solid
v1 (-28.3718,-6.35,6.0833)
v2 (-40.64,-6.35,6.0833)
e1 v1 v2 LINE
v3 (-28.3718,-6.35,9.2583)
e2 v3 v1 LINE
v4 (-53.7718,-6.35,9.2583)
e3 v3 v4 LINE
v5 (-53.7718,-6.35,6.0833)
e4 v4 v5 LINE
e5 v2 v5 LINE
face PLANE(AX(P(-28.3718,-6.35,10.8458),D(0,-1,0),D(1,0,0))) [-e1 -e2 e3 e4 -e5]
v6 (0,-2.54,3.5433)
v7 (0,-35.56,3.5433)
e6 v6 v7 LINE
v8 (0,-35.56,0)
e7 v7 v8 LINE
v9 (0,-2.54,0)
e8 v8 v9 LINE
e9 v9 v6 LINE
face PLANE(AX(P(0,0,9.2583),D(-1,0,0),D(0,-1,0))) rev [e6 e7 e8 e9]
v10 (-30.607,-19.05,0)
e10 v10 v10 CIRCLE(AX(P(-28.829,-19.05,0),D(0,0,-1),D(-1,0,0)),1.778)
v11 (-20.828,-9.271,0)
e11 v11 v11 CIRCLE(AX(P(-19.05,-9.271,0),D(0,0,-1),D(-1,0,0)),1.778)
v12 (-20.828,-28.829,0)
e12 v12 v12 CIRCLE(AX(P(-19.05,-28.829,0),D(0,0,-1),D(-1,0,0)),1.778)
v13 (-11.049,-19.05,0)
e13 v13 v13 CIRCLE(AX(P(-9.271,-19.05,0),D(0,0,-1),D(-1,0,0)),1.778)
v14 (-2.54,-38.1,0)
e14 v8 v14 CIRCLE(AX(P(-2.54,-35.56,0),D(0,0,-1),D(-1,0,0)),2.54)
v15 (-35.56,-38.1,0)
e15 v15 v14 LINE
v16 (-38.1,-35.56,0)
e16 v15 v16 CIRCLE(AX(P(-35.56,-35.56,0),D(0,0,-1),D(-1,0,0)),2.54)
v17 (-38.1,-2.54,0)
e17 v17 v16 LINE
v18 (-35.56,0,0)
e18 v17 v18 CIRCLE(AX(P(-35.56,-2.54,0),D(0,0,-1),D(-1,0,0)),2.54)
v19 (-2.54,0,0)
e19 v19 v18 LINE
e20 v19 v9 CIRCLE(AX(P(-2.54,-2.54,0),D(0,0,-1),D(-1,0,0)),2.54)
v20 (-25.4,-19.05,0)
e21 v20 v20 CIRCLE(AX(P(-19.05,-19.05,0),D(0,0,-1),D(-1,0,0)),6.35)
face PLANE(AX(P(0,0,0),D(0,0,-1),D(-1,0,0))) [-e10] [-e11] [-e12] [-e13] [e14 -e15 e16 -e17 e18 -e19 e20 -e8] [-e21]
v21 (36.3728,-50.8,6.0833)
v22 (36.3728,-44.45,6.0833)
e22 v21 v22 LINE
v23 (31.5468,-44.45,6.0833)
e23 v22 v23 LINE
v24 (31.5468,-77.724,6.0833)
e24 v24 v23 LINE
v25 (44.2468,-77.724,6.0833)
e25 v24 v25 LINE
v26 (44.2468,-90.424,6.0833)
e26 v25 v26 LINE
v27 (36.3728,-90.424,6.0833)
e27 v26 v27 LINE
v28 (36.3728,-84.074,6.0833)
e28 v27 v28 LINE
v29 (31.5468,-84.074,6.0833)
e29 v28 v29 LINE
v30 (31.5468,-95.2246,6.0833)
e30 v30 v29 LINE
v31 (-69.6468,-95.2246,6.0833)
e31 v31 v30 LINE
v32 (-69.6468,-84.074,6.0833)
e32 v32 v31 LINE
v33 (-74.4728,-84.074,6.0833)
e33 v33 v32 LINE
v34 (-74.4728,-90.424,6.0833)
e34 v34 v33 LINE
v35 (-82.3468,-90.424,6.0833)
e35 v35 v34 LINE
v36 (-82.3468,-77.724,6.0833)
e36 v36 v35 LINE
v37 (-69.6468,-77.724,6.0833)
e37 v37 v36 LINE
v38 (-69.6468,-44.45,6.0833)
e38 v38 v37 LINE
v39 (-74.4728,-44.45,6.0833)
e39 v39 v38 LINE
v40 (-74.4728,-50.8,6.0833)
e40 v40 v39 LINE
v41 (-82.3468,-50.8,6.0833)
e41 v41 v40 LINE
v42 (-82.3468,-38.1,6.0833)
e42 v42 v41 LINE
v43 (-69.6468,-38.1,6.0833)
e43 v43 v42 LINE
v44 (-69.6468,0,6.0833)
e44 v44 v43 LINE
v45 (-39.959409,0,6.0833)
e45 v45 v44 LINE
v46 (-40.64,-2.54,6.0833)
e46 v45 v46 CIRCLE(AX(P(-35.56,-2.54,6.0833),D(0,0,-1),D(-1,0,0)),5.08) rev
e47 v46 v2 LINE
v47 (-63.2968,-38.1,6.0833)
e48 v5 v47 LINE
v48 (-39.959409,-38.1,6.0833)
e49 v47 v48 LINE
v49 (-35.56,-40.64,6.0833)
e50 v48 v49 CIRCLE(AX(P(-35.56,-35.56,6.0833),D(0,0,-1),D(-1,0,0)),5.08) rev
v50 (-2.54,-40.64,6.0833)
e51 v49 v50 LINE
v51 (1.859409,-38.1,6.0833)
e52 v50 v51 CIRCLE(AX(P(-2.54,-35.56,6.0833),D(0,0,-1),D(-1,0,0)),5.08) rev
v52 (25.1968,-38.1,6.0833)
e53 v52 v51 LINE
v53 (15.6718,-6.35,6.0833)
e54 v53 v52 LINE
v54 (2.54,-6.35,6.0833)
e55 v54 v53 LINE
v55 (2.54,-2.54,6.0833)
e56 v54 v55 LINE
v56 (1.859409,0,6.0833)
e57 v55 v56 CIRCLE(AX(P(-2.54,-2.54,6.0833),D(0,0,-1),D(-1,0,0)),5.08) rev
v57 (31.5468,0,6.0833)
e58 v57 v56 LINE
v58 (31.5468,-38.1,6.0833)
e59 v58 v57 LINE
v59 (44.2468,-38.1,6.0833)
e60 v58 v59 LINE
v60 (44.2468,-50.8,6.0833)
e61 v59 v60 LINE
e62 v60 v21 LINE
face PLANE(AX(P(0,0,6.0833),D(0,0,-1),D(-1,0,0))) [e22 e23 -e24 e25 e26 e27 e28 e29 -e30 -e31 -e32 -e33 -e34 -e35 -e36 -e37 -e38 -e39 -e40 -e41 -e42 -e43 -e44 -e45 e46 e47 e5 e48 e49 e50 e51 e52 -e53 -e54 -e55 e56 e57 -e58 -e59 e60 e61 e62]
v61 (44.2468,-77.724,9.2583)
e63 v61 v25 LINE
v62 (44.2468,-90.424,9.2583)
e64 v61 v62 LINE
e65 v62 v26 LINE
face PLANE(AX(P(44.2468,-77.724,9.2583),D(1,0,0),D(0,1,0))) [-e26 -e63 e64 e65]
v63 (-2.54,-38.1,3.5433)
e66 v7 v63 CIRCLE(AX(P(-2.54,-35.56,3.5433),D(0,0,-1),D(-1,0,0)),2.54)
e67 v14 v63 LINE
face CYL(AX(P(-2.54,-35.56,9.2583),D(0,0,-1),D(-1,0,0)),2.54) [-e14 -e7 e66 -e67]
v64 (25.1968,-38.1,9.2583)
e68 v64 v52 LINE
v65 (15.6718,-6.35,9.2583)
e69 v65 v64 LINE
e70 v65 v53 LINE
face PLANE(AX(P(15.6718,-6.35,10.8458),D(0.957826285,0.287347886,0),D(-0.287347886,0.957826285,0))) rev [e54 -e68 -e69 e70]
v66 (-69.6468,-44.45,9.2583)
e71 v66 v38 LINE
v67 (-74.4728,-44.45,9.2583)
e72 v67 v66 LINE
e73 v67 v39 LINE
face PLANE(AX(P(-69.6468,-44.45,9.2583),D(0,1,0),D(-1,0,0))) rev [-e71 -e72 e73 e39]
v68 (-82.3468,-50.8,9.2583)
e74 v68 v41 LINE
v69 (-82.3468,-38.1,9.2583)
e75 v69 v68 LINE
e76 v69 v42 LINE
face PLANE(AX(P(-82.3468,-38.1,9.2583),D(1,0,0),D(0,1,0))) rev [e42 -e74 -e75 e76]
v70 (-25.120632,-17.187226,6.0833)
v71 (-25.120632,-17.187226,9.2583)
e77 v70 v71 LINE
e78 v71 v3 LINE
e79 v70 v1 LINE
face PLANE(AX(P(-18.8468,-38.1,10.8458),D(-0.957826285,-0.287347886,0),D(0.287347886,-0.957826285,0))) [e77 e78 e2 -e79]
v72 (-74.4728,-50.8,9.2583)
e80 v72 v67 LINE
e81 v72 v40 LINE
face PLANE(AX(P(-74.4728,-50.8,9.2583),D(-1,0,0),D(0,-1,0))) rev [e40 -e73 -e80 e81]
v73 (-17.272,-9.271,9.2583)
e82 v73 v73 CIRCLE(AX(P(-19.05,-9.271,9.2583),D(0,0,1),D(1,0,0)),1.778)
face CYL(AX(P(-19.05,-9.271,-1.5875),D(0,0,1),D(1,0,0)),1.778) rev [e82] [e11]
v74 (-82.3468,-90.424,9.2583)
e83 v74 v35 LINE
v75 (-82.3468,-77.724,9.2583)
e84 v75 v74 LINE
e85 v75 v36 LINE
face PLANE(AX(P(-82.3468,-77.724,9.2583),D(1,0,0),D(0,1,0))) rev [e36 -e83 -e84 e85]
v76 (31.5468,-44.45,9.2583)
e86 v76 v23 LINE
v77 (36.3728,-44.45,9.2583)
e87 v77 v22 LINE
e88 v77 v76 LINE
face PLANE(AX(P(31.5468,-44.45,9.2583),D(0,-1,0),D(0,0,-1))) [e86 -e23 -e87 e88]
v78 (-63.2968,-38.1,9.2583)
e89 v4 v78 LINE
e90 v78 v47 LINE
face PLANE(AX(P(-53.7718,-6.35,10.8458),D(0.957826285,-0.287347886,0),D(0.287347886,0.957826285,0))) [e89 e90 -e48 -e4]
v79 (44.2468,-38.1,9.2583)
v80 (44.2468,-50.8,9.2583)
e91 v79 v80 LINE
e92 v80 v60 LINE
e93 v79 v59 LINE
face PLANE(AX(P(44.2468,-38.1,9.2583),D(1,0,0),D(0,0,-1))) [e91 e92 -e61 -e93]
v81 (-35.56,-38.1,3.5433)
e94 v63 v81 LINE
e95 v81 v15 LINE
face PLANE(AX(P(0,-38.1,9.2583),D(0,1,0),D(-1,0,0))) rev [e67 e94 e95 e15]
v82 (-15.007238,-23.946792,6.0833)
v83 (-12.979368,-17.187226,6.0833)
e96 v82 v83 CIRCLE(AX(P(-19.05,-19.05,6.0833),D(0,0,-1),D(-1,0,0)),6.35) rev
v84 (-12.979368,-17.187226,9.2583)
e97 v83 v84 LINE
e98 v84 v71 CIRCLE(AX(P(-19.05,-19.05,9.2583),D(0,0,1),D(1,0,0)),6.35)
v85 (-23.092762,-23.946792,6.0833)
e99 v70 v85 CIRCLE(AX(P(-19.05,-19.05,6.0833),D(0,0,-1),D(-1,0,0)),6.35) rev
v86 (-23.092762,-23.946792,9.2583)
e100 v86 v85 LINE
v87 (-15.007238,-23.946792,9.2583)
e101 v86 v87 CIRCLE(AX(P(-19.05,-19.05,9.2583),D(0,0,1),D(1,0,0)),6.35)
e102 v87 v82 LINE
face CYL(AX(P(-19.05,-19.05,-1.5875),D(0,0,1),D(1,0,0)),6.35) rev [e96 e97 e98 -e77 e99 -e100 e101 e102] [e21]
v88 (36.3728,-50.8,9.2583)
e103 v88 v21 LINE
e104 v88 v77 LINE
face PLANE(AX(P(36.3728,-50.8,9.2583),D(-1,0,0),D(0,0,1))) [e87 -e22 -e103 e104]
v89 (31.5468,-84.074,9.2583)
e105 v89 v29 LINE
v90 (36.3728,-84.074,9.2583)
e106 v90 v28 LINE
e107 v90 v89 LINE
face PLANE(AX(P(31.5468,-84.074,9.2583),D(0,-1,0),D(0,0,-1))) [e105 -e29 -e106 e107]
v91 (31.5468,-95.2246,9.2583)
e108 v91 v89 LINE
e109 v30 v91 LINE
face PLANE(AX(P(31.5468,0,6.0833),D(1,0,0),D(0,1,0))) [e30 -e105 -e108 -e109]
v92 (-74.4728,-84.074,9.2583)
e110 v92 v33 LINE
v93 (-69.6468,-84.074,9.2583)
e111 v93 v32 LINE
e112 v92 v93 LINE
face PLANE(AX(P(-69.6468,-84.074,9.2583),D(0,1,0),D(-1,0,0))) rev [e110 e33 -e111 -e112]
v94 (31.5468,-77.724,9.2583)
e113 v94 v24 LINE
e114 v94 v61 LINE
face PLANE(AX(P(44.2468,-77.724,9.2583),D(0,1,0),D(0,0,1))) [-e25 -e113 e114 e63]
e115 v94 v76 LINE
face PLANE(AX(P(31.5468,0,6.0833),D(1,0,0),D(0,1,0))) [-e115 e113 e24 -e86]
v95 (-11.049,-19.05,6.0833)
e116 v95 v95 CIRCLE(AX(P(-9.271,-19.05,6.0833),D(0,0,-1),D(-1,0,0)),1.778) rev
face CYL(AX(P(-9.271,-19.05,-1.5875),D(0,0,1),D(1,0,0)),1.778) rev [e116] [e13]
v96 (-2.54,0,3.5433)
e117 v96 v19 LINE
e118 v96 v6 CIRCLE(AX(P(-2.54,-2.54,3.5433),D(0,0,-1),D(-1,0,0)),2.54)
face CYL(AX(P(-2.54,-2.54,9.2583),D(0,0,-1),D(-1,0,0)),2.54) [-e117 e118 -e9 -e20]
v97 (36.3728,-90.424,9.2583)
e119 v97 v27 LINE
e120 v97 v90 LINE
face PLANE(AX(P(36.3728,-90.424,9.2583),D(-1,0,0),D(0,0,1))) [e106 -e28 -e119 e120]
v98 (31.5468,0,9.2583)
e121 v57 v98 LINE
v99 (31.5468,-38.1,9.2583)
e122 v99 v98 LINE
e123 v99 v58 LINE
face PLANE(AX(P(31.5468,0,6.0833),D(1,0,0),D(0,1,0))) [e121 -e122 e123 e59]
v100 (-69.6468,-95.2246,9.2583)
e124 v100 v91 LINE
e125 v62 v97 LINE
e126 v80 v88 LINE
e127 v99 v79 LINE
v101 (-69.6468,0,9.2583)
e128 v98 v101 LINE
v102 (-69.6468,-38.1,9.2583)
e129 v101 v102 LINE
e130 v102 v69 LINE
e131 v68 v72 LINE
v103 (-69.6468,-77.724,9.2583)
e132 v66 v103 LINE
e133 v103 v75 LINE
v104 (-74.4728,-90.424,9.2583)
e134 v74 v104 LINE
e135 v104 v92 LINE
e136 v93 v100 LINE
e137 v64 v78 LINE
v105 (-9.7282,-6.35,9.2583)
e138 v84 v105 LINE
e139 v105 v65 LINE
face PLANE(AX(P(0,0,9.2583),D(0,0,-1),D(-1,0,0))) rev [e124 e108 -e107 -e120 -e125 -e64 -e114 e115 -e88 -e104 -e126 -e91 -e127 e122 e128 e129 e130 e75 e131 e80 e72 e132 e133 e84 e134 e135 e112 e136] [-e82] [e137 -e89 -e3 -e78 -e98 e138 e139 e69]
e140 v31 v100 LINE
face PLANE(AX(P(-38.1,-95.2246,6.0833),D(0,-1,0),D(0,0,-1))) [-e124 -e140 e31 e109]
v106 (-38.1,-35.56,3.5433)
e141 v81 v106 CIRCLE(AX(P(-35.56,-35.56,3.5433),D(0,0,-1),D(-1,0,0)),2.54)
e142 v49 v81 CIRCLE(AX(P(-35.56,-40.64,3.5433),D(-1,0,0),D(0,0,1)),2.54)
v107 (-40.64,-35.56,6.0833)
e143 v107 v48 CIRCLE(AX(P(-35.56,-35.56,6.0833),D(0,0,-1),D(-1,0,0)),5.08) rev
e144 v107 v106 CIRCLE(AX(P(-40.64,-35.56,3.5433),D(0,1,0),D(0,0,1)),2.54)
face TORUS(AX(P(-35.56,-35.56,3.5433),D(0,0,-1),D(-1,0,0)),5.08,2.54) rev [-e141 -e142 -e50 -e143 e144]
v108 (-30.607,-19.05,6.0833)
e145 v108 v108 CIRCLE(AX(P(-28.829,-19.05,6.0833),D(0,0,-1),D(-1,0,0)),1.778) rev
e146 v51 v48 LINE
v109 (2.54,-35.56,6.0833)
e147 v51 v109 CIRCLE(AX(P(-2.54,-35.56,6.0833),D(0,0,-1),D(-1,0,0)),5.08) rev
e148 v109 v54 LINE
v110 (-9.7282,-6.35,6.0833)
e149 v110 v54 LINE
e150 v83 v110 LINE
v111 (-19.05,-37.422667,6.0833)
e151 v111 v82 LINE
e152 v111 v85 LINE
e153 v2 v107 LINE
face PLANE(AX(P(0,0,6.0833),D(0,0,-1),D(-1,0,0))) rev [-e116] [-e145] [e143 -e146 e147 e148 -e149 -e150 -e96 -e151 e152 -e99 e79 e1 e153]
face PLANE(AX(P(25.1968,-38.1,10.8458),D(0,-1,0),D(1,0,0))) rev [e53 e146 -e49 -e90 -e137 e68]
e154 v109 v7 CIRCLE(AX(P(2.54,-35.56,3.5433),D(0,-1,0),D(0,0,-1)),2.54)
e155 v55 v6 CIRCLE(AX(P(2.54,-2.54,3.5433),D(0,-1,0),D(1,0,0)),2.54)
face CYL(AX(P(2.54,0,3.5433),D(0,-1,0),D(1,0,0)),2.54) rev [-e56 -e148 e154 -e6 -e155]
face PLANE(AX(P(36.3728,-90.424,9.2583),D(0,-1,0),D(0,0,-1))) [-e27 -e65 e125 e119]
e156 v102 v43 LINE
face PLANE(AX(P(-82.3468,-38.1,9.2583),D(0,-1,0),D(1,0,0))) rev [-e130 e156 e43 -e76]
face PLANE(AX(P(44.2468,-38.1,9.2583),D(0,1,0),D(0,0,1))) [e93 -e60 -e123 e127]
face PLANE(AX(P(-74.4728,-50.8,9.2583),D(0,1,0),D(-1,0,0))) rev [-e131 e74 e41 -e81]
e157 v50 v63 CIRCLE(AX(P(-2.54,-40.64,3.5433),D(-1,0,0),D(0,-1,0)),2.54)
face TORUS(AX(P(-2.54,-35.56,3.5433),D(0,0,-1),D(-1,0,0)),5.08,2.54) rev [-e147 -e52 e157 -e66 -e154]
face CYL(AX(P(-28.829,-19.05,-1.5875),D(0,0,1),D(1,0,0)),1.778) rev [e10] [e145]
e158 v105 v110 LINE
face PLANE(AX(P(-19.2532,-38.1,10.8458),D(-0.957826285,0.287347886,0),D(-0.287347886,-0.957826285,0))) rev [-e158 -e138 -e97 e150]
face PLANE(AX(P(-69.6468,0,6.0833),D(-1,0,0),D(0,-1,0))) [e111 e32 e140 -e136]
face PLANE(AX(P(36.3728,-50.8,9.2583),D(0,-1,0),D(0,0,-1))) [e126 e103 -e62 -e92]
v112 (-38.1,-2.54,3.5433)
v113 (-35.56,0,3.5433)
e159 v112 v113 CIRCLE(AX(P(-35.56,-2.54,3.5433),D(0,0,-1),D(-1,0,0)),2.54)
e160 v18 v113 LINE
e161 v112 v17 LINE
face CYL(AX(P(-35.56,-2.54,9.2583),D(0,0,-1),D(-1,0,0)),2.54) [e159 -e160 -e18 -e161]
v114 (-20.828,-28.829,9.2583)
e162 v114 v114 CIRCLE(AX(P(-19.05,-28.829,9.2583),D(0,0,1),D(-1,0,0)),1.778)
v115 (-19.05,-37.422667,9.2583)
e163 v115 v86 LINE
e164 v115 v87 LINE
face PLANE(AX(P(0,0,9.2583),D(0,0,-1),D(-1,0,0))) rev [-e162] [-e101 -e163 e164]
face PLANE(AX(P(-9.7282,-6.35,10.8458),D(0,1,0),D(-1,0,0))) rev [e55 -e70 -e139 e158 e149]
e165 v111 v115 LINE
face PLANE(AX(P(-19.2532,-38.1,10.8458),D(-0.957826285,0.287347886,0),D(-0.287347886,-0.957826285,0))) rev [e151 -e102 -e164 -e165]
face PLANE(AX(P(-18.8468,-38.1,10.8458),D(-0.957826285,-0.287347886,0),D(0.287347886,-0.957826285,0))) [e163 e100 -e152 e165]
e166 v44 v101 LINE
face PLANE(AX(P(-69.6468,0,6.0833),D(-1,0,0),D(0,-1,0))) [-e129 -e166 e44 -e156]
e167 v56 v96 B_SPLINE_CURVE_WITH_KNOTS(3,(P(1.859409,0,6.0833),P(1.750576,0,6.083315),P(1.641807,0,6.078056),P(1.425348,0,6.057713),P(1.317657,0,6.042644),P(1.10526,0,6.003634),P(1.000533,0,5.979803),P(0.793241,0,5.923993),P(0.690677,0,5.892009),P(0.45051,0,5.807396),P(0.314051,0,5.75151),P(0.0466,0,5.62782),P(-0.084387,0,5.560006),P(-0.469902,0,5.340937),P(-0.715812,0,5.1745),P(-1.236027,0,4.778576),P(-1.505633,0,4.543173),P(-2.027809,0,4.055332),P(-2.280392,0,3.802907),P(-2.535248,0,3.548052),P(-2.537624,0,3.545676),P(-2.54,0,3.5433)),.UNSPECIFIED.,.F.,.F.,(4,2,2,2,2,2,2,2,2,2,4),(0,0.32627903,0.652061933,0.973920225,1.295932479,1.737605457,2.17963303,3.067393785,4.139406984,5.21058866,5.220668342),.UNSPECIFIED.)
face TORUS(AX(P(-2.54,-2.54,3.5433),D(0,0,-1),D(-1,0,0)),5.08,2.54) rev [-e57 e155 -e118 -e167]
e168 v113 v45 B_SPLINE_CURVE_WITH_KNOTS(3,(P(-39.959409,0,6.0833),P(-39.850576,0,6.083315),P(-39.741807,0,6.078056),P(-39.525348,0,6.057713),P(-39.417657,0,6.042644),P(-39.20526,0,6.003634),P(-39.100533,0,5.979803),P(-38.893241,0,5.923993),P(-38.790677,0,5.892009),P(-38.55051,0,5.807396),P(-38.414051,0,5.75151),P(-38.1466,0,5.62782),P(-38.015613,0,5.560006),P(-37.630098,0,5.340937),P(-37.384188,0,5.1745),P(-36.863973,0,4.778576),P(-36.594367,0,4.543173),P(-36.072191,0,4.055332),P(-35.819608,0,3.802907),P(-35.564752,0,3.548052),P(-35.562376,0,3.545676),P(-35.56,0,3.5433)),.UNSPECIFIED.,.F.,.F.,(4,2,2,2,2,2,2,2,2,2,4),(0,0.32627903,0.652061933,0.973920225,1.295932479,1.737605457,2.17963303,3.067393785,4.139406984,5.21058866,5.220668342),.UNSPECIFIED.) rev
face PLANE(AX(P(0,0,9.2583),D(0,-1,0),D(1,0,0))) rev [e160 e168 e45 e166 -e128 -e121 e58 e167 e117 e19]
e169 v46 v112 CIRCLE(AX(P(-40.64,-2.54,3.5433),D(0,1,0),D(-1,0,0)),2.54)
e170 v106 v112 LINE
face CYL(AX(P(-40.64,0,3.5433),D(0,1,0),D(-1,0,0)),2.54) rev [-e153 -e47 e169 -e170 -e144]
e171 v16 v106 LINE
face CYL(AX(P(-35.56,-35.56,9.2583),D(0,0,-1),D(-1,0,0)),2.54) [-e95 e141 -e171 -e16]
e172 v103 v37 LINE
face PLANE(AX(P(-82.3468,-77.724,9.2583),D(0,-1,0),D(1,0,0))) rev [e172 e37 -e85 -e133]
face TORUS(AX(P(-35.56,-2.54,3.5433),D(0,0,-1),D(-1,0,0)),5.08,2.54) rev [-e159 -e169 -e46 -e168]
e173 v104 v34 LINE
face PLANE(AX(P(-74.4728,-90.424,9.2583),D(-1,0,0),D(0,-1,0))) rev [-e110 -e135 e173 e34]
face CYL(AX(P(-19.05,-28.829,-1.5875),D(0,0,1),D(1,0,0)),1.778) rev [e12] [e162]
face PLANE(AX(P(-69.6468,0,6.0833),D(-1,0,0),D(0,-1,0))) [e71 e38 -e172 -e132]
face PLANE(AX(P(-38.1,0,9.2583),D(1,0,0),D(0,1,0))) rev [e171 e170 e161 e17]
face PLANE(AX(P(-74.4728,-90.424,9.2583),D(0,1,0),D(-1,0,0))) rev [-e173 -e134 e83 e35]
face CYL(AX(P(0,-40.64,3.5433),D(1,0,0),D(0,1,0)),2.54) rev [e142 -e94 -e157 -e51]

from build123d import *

# Parameters (mm, degrees)
SKETCH1_W           = 38.1
SKETCH1_H           = 38.1
BOSS_EXTRUDE1_DEPTH = 9.2583
SKETCH2_R           = 6.35
CUT_EXTRUDE1_DEPTH  = 10.8458
SKETCH3_R           = 1.778
CUT_EXTRUDE2_DEPTH  = 10.8458
CIRPATTERN1_COUNT   = 4
SKETCH4_W           = 31.5468
SKETCH4_H           = 95.2246
BOSS_EXTRUDE2_DEPTH = 3.175
SKETCH5_W           = 38.1
SKETCH5_H           = 57.1246
BOSS_EXTRUDE3_DEPTH = 3.175
FILLET1_R           = 2.54
FILLET2_R           = 2.54
BOSS_EXTRUDE4_DEPTH = 3.175
CUT_EXTRUDE3_DEPTH  = 4.7625


with BuildPart() as part:
    # Sketch1 → Boss-Extrude1 (new body)
    with BuildSketch(Plane.XY):
        with Locations((-19.05, -19.05)):
            Rectangle(SKETCH1_W, SKETCH1_H)
    extrude(amount=BOSS_EXTRUDE1_DEPTH)

    # Sketch2 → Cut-Extrude1 (cut)
    with BuildSketch(Plane.XY.offset(9.2583)):
        with Locations((-19.05, -19.05)):
            Circle(SKETCH2_R)
    extrude(amount=-CUT_EXTRUDE1_DEPTH, mode=Mode.SUBTRACT)

    # Sketch3 → Cut-Extrude2 (cut)
    with BuildSketch(Plane.XY.offset(9.2583)):
        with Locations((-19.05, -9.271)):
            Circle(SKETCH3_R)
    cut_extrude2 = extrude(amount=-CUT_EXTRUDE2_DEPTH, mode=Mode.SUBTRACT)

    # CirPattern1: Cut-Extrude2 ×4 about axis
    cirpattern1_axis = Axis((-19.05, -19.05, 0), (0, 0, 1))
    for i in range(1, CIRPATTERN1_COUNT):
        add(cut_extrude2.rotate(cirpattern1_axis, i * 360 / CIRPATTERN1_COUNT), mode=Mode.SUBTRACT)

    # Sketch4 → Boss-Extrude2 (add)
    with BuildSketch(Plane.XY.offset(9.2583)):
        with Locations((-53.8734, -47.6123)):
            Rectangle(SKETCH4_W, SKETCH4_H)
        with Locations((15.7734, -47.6123)):
            Rectangle(SKETCH4_W, SKETCH4_H)
    extrude(amount=-BOSS_EXTRUDE2_DEPTH)

    # Sketch5 → Boss-Extrude3 (add)
    with BuildSketch(Plane(origin=(0, 0, 6.0833), x_dir=(-1, 0, 0), z_dir=(0, 0, -1))):
        with Locations((19.05, -66.6623)):
            Rectangle(SKETCH5_W, SKETCH5_H)
    extrude(amount=-BOSS_EXTRUDE3_DEPTH)

    # Fillet1
    fillet1_edges = [part.edges().sort_by_distance(p)[0] for p in [
        (-38.1, -38.1, 3.04165),
        (-38.1, 0, 3.04165),
        (0, 0, 3.04165),
        (0, -38.1, 3.04165),
    ]]
    fillet(fillet1_edges, radius=FILLET1_R)

    # Fillet2
    # the kernel refuses this fillet: 2.54 mm, written as the material it adds along each edge
    with BuildSketch(Plane(origin=(-38.1, -35.56, 6.0833), x_dir=(0, 0, -1), z_dir=(0, 1, 0)), Plane(origin=(-2.54, -38.1, 6.0833), x_dir=(0, 0, -1), z_dir=(-1, 0, 0))) as fillet2_piece_1:
        with BuildLine():
            CenterArc((FILLET2_R, FILLET2_R), FILLET2_R, 180, 90)
            Line((0, FILLET2_R), (0, 0))
            Line((0, 0), (FILLET2_R, 0))
        make_face()
    extrude(amount=33.02)
    with BuildSketch(Plane(origin=(0, -35.56, 6.0833), x_dir=(0, 0, -1), z_dir=(0, 1, 0))) as fillet2_piece_2:
        with BuildLine():
            CenterArc((FILLET2_R, -FILLET2_R), FILLET2_R, 90, 90)
            Line((0, -FILLET2_R), (0, 0))
            Line((0, 0), (FILLET2_R, 0))
        make_face()
    extrude(amount=33.02)
    with BuildSketch(Plane(origin=(-35.56, -2.54, 6.0833), x_dir=(0.5976672776328278, -0.8017442392976482, 0), z_dir=(-0.8017442392976482, -0.5976672776328278, 0))) as fillet2_piece_3_section:
        with BuildLine():
            CenterArc((2.54 + FILLET2_R, -FILLET2_R), FILLET2_R, 90, 90)
            Line((2.54 + FILLET2_R, 0), (2.54, 0))
            Line((2.54, 0), (2.54, -FILLET2_R))
        make_face()
    fillet2_piece_3 = revolve(axis=Axis((-35.56, -2.54, 6.0833), (0, 0, 1)), revolution_arc=233.296989237, mode=Mode.PRIVATE)
    fillet2_piece_3 = split(fillet2_piece_3, bisect_by=Plane(origin=(-37.464844957, 0, 5.291764105), z_dir=(0, -1, 0)), keep=Keep.TOP, mode=Mode.PRIVATE)
    add(fillet2_piece_3)
    with BuildSketch(Plane(origin=(-35.56, -35.56, 6.0833), x_dir=(0, -1, 0), z_dir=(1, 0, 0))) as fillet2_piece_4:
        with BuildLine():
            CenterArc((2.54 + FILLET2_R, FILLET2_R), FILLET2_R, 180, 90)
            Line((2.54 + FILLET2_R, 0), (2.54, 0))
            Line((2.54, 0), (2.54, FILLET2_R))
        make_face()
    revolve(axis=Axis((-35.56, -35.56, 6.0833), (0, 0, -1)), revolution_arc=90)
    with BuildSketch(Plane(origin=(-2.54, -35.56, 6.0833), x_dir=(0, -1, 0), z_dir=(-1, 0, 0))) as fillet2_piece_5:
        with BuildLine():
            CenterArc((2.54 + FILLET2_R, -FILLET2_R), FILLET2_R, 90, 90)
            Line((2.54 + FILLET2_R, 0), (2.54, 0))
            Line((2.54, 0), (2.54, -FILLET2_R))
        make_face()
    revolve(axis=Axis((-2.54, -35.56, 6.0833), (0, 0, 1)), revolution_arc=90)
    with BuildSketch(Plane(origin=(-2.54, -2.54, 6.0833), x_dir=(-0.5976672776328275, -0.8017442392976483, 0), z_dir=(0.8017442392976483, -0.5976672776328275, 0))) as fillet2_piece_6_section:
        with BuildLine():
            CenterArc((2.54 + FILLET2_R, FILLET2_R), FILLET2_R, 180, 90)
            Line((2.54, FILLET2_R), (2.54, 0))
            Line((2.54, 0), (2.54 + FILLET2_R, 0))
        make_face()
    fillet2_piece_6 = revolve(axis=Axis((-2.54, -2.54, 6.0833), (0, 0, -1)), revolution_arc=233.296989237, mode=Mode.PRIVATE)
    fillet2_piece_6 = split(fillet2_piece_6, bisect_by=Plane(origin=(-0.63515521, 0, 5.291763812), z_dir=(0, -1, 0)), keep=Keep.TOP, mode=Mode.PRIVATE)
    add(fillet2_piece_6)

    # Sketch6 → Boss-Extrude4 (add)
    with BuildSketch(Plane(origin=(0, 0, 6.0833), x_dir=(-1, 0, 0), z_dir=(0, 0, -1))):
        Polygon((-36.3728, -50.8), (-44.2468, -50.8), (-44.2468, -38.1), (-31.5468, -38.1), (-31.5468, -44.45), (-36.3728, -44.45), align=None)
        Polygon((-36.3728, -90.424), (-44.2468, -90.424), (-44.2468, -77.724), (-31.5468, -77.724), (-31.5468, -84.074), (-36.3728, -84.074), align=None)
    boss_extrude4 = extrude(amount=-BOSS_EXTRUDE4_DEPTH)

    # Mirror2: Boss-Extrude4 across plane
    add(boss_extrude4.mirror(Plane(origin=(-19.05, 0, 0), x_dir=(0, 0, 1), z_dir=(1, 0, 0))))

    # Sketch8 → Cut-Extrude3 (cut)
    with BuildSketch(Plane(origin=(0, 0, 6.0833), x_dir=(-1, 0, 0), z_dir=(0, 0, -1))):
        Polygon((-25.1968, -38.1), (19.2532, -38.1), (9.7282, -6.35), (-15.6718, -6.35), align=None)
    cut_extrude3 = extrude(amount=-CUT_EXTRUDE3_DEPTH, mode=Mode.SUBTRACT)

    # Mirror3: Cut-Extrude3 across plane
    add(cut_extrude3.mirror(Plane(origin=(-19.05, 0, 0), x_dir=(0, 0, 1), z_dir=(1, 0, 0))), mode=Mode.SUBTRACT)


solid = part.part
